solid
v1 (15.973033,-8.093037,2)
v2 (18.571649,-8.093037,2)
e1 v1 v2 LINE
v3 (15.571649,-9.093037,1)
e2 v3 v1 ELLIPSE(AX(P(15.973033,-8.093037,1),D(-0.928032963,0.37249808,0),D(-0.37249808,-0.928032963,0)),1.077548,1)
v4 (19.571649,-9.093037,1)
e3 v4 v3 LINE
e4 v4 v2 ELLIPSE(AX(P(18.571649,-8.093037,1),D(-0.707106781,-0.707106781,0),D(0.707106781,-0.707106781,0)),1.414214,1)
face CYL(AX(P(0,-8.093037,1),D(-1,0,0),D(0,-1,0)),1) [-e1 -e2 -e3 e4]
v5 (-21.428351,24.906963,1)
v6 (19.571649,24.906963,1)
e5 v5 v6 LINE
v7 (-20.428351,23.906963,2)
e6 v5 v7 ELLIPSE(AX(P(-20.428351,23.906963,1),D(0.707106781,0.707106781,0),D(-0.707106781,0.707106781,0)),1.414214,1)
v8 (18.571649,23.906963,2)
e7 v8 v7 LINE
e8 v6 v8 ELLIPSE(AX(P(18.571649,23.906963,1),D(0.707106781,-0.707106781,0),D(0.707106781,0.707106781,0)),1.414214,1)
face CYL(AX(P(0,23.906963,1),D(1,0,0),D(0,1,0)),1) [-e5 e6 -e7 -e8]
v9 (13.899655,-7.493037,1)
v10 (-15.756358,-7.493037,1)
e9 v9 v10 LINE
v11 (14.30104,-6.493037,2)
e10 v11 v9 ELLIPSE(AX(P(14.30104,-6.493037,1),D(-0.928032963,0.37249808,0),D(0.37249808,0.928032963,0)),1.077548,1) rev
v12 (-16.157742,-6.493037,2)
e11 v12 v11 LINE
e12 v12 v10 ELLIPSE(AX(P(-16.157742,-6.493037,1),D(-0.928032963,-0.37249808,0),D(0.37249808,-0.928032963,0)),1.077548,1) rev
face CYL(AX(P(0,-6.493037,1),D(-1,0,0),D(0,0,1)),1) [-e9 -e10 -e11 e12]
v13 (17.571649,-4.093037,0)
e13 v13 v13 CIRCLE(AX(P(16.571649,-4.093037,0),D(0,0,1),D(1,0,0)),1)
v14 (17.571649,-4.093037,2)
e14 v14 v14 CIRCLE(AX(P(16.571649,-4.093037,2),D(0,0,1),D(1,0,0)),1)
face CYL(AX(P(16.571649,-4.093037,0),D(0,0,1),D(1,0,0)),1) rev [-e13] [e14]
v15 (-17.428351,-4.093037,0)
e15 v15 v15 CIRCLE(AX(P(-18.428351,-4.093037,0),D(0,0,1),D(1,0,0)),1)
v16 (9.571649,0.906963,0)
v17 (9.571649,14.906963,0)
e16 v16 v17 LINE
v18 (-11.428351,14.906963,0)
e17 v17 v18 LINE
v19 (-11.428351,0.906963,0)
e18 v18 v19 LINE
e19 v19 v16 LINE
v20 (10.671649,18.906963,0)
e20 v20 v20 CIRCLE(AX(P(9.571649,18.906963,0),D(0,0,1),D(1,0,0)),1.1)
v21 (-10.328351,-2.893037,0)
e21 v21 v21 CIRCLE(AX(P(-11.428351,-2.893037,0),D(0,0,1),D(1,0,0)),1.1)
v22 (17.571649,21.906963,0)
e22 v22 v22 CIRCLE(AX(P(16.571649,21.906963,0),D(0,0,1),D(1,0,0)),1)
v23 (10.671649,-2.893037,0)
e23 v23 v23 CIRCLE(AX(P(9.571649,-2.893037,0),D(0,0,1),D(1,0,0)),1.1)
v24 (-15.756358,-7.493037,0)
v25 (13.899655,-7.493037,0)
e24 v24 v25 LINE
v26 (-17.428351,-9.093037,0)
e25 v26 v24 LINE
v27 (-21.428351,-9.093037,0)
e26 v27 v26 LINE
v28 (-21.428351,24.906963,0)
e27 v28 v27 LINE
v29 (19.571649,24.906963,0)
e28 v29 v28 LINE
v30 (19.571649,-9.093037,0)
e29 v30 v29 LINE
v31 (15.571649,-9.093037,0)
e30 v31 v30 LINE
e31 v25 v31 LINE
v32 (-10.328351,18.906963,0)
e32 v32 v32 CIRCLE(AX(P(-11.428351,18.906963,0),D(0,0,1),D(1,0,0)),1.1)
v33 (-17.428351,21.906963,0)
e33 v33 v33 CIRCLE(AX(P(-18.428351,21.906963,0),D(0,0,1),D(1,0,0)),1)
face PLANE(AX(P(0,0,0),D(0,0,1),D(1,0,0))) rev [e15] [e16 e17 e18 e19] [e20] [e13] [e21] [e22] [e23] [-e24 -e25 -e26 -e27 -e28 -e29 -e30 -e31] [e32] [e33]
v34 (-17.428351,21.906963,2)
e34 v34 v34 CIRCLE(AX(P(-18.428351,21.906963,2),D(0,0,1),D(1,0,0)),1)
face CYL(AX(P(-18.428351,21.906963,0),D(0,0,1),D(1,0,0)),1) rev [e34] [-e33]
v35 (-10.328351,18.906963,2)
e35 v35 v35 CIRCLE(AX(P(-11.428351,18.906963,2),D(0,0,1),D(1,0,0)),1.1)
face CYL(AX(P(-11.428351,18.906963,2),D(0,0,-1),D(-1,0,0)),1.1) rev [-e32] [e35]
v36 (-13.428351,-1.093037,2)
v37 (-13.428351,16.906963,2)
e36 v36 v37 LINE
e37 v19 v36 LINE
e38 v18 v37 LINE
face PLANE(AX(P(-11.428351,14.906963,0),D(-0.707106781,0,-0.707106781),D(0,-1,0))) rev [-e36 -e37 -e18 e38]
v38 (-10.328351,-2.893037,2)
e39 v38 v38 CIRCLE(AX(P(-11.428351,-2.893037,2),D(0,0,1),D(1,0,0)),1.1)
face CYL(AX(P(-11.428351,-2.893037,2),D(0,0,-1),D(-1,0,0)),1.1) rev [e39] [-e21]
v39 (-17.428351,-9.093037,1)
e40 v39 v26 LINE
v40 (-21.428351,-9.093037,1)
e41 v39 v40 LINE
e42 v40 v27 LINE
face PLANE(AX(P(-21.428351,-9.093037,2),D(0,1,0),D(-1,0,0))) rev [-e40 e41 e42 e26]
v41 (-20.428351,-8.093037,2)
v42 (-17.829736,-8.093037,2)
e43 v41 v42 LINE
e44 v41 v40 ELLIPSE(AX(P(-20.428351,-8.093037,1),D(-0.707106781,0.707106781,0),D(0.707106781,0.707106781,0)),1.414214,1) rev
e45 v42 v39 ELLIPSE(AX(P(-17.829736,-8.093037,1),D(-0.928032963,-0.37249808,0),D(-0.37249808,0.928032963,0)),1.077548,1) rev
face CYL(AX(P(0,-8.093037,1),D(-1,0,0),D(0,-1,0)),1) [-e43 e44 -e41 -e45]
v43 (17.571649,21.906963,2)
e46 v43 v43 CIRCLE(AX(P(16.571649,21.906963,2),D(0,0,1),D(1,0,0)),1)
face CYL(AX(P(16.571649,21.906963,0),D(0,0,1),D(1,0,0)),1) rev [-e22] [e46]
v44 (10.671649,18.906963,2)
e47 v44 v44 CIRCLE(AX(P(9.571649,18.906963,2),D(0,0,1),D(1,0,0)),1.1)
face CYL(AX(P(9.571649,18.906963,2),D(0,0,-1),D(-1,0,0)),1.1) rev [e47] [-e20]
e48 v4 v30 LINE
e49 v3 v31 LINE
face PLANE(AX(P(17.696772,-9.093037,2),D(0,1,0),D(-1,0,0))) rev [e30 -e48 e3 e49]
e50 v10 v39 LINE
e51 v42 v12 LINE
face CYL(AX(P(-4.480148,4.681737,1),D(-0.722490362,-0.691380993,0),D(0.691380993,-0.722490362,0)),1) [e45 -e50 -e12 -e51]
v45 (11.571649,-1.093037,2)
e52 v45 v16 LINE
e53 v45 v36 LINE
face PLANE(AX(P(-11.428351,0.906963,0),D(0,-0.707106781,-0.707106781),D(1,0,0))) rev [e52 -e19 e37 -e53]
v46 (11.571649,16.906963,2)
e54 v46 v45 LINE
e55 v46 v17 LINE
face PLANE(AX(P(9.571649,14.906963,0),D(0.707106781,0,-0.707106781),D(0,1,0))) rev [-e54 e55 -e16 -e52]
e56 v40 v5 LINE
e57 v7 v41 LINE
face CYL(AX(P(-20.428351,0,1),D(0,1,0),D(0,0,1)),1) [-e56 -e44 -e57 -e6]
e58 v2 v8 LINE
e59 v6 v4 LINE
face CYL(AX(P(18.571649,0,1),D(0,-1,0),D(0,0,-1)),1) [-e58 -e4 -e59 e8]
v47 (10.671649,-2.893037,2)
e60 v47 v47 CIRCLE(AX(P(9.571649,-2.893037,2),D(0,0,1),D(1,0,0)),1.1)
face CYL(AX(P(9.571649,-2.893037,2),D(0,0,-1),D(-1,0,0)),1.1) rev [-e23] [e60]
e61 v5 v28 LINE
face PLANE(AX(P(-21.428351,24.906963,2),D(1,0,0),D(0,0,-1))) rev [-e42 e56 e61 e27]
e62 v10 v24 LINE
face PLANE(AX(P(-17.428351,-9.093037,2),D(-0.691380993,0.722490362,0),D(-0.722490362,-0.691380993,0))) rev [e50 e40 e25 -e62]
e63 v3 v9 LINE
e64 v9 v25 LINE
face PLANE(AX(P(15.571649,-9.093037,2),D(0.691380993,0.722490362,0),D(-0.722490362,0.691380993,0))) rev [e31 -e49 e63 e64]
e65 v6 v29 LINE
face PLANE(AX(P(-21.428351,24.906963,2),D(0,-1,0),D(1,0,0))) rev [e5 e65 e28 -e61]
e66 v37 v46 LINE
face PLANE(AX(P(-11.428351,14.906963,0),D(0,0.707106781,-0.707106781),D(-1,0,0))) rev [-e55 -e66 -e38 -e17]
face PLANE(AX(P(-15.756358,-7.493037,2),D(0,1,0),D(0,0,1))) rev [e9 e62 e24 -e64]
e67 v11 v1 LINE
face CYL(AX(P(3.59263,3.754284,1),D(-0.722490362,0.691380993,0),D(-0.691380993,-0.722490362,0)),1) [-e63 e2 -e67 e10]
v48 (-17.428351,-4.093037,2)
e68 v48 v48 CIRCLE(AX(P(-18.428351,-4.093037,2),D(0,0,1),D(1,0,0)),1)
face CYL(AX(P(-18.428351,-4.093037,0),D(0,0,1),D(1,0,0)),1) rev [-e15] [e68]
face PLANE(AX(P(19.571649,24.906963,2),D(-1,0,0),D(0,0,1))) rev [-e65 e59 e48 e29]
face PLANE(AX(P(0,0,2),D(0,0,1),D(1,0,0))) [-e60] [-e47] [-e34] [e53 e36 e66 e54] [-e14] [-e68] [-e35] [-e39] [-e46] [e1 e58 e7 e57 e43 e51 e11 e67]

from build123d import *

# Parameters (mm, degrees)
SKETCH_1_R          = 1.1
SKETCH_1_W          = 21
SKETCH_1_H          = 14
EXTRUDE_1_DEPTH     = 2
FILLET_2_R          = 1
SKETCH_11_R         = 1
CUT_EXTRUDE_1_DEPTH = 33.917032345
CHAMFER_1_SIZE      = 2


with BuildPart() as part:
    # 草图1 → 凸台-拉伸1 (new body)
    with BuildSketch(Plane.XY):
        Polygon((-21.428351104, 24.906962627), (19.571648896, 24.906962627), (19.571648896, -9.093037373), (17.69677195, -9.093037373), (15.571648896, -9.093037373), (13.89965532, -7.493037373), (-15.756357529, -7.493037373), (-17.428351104, -9.093037373), (-21.428351104, -9.093037373), align=None)
        with Locations((-11.428351104, 18.906962627)):
            Circle(SKETCH_1_R, mode=Mode.SUBTRACT)
        with Locations((-11.428351104, -2.893037373)):
            Circle(SKETCH_1_R, mode=Mode.SUBTRACT)
        with Locations((9.571648896, 18.906962627)):
            Circle(SKETCH_1_R, mode=Mode.SUBTRACT)
        with Locations((9.571648896, -2.893037373)):
            Circle(SKETCH_1_R, mode=Mode.SUBTRACT)
        with Locations((-0.928351104, 7.906962627)):
            Rectangle(SKETCH_1_W, SKETCH_1_H, mode=Mode.SUBTRACT)
    extrude(amount=EXTRUDE_1_DEPTH)

    # 圆角2
    fillet_2_edges = [part.edges().sort_by_distance(p)[0] for p in [
        (-16.592354317, -8.293037373, 2),
        (-0.928351104, -7.493037373, 2),
        (14.735652108, -8.293037373, 2),
        (17.571648896, -9.093037373, 2),
        (19.571648896, 7.906962627, 2),
        (-0.928351104, 24.906962627, 2),
        (-21.428351104, 7.906962627, 2),
        (-19.428351104, -9.093037373, 2),
    ]]
    fillet(fillet_2_edges, radius=FILLET_2_R)

    # 草图11 → 切除-拉伸1 (cut, through all)
    with BuildSketch(Plane.XY.offset(2)):
        with Locations((-18.428351104, 21.906962627)):
            Circle(SKETCH_11_R)
        with Locations((-18.428351104, -4.093037373)):
            Circle(SKETCH_11_R)
        with Locations((16.571648896, 21.906962627)):
            Circle(SKETCH_11_R)
        with Locations((16.571648896, -4.093037373)):
            Circle(SKETCH_11_R)
    extrude(amount=-CUT_EXTRUDE_1_DEPTH, mode=Mode.SUBTRACT)

    # 倒角1
    chamfer_1_edges = [part.edges().sort_by_distance(p)[0] for p in [
        (-0.928351104, 0.906962627, 2),
        (9.571648896, 7.906962627, 2),
        (-11.428351104, 7.906962627, 2),
        (-0.928351104, 14.906962627, 2),
    ]]
    chamfer(chamfer_1_edges, length=CHAMFER_1_SIZE - 0.0001)  # a hair under: the kernel refuses the full size


solid = part.part
